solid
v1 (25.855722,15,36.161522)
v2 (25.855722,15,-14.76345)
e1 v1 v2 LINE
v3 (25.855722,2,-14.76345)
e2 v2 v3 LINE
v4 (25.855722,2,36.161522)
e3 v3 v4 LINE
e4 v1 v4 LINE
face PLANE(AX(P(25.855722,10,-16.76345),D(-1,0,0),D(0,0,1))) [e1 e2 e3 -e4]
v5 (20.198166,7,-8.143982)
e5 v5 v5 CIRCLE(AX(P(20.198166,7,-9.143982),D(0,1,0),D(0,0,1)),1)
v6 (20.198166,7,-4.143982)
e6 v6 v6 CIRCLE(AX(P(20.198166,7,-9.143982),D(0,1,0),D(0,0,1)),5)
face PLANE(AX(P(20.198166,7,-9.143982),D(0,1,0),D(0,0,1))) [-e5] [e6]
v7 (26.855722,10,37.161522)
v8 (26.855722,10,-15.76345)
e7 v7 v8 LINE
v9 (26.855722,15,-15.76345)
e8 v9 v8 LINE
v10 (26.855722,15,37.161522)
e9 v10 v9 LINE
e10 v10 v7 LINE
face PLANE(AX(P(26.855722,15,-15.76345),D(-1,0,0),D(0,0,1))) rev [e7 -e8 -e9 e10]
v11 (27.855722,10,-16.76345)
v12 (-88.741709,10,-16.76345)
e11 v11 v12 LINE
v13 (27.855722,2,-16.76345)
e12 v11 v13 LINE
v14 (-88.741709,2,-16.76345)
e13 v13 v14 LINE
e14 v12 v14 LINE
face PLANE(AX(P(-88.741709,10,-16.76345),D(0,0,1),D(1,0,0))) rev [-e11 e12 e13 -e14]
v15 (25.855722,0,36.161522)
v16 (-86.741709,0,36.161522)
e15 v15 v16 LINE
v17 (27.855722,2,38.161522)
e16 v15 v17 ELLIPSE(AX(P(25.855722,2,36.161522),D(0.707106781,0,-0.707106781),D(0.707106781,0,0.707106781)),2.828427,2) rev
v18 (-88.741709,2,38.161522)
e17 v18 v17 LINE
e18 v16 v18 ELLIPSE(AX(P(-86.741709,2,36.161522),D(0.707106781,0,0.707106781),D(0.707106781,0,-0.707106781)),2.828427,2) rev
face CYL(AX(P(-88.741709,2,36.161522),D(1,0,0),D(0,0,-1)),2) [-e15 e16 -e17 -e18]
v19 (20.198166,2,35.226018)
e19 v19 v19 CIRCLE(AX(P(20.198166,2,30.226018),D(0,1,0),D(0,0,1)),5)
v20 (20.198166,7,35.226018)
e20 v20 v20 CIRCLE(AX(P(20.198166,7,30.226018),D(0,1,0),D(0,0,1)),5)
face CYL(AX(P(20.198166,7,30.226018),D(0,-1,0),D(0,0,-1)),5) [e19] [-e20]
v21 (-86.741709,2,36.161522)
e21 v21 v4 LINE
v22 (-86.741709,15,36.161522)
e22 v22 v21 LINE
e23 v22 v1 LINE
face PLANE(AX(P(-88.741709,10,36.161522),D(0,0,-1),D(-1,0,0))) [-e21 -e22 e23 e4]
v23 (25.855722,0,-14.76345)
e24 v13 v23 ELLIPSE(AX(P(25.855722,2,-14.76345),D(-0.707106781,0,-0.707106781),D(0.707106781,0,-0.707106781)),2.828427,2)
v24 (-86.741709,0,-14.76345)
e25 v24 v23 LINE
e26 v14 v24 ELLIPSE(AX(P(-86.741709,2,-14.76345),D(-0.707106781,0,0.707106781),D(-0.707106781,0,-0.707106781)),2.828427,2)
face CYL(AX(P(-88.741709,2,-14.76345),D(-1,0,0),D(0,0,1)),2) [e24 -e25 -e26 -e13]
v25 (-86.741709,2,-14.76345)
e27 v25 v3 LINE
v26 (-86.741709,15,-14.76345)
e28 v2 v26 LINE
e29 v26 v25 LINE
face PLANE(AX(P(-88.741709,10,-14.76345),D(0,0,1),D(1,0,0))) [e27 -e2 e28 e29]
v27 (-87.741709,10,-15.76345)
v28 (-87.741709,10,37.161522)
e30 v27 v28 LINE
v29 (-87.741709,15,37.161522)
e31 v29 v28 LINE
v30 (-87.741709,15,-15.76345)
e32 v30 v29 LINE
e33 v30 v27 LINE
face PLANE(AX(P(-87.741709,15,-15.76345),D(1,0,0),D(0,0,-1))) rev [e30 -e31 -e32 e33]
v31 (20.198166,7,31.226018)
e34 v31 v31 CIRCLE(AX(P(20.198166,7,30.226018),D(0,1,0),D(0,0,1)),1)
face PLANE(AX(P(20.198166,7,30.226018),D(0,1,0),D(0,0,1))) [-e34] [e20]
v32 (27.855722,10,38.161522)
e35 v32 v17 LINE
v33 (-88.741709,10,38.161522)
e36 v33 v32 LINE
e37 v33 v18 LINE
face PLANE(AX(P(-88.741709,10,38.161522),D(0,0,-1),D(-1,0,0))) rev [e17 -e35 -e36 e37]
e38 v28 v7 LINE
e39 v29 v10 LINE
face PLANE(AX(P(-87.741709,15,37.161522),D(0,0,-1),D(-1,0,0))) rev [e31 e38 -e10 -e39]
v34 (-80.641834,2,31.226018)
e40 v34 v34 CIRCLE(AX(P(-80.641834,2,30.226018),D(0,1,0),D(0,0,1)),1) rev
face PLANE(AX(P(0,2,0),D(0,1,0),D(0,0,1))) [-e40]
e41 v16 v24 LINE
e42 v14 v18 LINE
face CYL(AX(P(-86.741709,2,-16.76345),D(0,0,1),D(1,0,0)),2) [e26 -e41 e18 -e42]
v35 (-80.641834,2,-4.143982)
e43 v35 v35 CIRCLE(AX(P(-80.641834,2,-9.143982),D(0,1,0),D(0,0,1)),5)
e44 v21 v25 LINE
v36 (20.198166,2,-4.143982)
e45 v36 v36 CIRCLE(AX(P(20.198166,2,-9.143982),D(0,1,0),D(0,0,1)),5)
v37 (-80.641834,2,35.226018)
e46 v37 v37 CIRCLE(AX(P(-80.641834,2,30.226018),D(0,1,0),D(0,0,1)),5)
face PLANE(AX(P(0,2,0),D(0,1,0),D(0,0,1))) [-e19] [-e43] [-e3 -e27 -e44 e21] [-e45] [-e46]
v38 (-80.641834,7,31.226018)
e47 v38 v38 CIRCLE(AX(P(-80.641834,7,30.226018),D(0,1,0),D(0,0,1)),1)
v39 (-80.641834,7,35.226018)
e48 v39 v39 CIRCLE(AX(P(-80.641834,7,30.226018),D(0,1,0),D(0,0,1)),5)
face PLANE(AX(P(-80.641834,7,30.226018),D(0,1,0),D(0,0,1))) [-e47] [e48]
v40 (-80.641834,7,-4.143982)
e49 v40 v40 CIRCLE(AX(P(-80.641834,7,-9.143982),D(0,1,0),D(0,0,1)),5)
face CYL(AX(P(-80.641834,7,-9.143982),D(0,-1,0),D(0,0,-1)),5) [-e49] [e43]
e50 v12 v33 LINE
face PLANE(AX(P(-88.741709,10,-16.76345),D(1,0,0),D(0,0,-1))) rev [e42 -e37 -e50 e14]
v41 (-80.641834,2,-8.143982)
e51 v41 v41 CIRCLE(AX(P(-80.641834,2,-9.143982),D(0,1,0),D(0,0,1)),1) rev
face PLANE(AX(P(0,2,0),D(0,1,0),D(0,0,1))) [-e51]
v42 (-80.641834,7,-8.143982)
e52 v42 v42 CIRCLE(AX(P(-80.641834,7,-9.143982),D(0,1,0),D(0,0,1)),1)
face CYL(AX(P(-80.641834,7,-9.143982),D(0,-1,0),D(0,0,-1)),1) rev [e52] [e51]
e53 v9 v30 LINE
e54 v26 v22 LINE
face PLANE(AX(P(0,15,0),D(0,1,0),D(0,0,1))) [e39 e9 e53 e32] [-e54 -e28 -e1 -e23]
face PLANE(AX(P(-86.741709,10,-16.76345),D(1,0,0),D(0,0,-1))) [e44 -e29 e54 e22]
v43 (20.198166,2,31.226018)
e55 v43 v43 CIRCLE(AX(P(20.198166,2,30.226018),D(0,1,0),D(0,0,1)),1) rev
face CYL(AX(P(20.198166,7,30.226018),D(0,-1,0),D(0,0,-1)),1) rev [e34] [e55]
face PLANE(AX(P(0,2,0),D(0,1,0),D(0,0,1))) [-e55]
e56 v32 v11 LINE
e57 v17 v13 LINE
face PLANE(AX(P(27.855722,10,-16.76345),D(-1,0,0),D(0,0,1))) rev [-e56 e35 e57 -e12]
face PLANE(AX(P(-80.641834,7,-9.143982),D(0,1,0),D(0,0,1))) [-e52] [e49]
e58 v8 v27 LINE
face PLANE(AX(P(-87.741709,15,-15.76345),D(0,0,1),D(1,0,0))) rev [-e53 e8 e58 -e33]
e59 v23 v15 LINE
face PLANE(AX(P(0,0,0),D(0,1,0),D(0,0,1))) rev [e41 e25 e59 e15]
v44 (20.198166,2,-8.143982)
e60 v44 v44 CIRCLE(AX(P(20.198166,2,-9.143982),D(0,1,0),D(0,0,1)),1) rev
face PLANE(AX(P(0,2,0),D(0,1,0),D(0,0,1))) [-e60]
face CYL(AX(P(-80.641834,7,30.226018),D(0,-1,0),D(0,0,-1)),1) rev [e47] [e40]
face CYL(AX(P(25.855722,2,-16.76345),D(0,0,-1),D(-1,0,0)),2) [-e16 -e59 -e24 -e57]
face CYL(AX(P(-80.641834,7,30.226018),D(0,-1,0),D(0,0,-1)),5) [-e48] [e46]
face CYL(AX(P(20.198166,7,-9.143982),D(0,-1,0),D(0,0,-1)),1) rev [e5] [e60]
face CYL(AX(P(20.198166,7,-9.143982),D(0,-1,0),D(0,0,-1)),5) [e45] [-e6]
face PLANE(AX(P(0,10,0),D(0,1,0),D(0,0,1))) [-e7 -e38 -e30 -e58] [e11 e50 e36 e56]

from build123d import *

# Parameters (mm, degrees)
ESQUISSE1_W             = 116.597430489
ESQUISSE1_H             = 54.924972195
BOSS_EXTRU_1_DEPTH      = 10
CONG_1_R                = 2
COQUE2_START            = -86.741708543
COQUE2_OUTLINE_W        = 6
COQUE2_OUTLINE_H        = 50.924972195
COQUE2_DEPTH            = 112.597430489
ESQUISSE2_W             = 112.597430489
ESQUISSE2_H             = 50.924972195
ENL_V_MAT_EXTRU_2_DEPTH = 2
SUPPORT_VIS_R           = 5
SUPPORT_VIS_R_2         = 1
EX_SUPPORT_DEPTH        = 5
PAROIS_W                = 114.597430489
PAROIS_H                = 52.924972195
PAROIS_W_2              = 112.597430489
PAROIS_H_2              = 50.924972195
EX_PAROIS_DEPTH         = 5


# Read off the part's stored shape, not the designer's step: Coque2
with BuildPart() as part:
    # Esquisse1 → Boss.-Extru.1 (new body)
    with BuildSketch(Plane(origin=(0, 0, 0), x_dir=(1, 0, 0), z_dir=(0, 1, 0))):
        with Locations((-30.442993298, -10.699035797)):
            Rectangle(ESQUISSE1_W, ESQUISSE1_H)
    extrude(amount=BOSS_EXTRU_1_DEPTH)

    # Congé1
    cong_1_edges = [part.edges().sort_by_distance(p)[0] for p in [
        (-30.442993298, 0, -16.7634503),
        (27.855721946, 0, 10.699035797),
        (-30.442993298, 0, 38.161521895),
        (-88.741708543, 0, 10.699035797),
    ]]
    fillet(cong_1_edges, radius=CONG_1_R)

    # Coque2 outline → Coque2 (cut)
    with BuildSketch(Plane.YZ.offset(COQUE2_START)):
        with Locations((5, 10.699035797)):
            Rectangle(COQUE2_OUTLINE_W, COQUE2_OUTLINE_H)
    extrude(amount=COQUE2_DEPTH, mode=Mode.SUBTRACT)

    # Esquisse2 → Enlèv. mat.-Extru.2 (cut)
    with BuildSketch(Plane(origin=(0, 10, 0), x_dir=(1, 0, 0), z_dir=(0, 1, 0))):
        with Locations((-30.442993298, -10.699035797)):
            Rectangle(ESQUISSE2_W, ESQUISSE2_H)
    extrude(amount=-ENL_V_MAT_EXTRU_2_DEPTH, mode=Mode.SUBTRACT)

    # support_vis → ex_support (add)
    # profile 1 of 4: a face of its own
    with BuildSketch(Plane(origin=(0, 2, 0), x_dir=(1, 0, 0), z_dir=(0, 1, 0))):
        with Locations(Location((-80.641833666, 9.143982461, 0), (0, 0, 270))):
            Circle(SUPPORT_VIS_R)
        with Locations(Location((-80.641833666, 9.143982461, 0), (0, 0, 270))):
            Circle(SUPPORT_VIS_R_2, mode=Mode.SUBTRACT)
    # profile 2 of 4: a face of its own
    with BuildSketch(Plane(origin=(0, 2, 0), x_dir=(1, 0, 0), z_dir=(0, 1, 0))):
        with Locations(Location((20.198166334, 9.143982461, 0), (0, 0, 270))):
            Circle(SUPPORT_VIS_R)
        with Locations(Location((20.198166334, 9.143982461, 0), (0, 0, 270))):
            Circle(SUPPORT_VIS_R_2, mode=Mode.SUBTRACT)
    # profile 3 of 4: a face of its own
    with BuildSketch(Plane(origin=(0, 2, 0), x_dir=(1, 0, 0), z_dir=(0, 1, 0))):
        with Locations(Location((-80.641833666, -30.226017539, 0), (0, 0, 270))):
            Circle(SUPPORT_VIS_R)
        with Locations(Location((-80.641833666, -30.226017539, 0), (0, 0, 270))):
            Circle(SUPPORT_VIS_R_2, mode=Mode.SUBTRACT)
    # profile 4 of 4: a face of its own
    with BuildSketch(Plane(origin=(0, 2, 0), x_dir=(1, 0, 0), z_dir=(0, 1, 0))):
        with Locations(Location((20.198166334, -30.226017539, 0), (0, 0, 270))):
            Circle(SUPPORT_VIS_R)
        with Locations(Location((20.198166334, -30.226017539, 0), (0, 0, 270))):
            Circle(SUPPORT_VIS_R_2, mode=Mode.SUBTRACT)
    extrude(amount=EX_SUPPORT_DEPTH)

    # parois → ex_parois (add)
    with BuildSketch(Plane(origin=(0, 10, 0), x_dir=(1, 0, 0), z_dir=(0, 1, 0))):
        with Locations((-30.442993298, -10.699035797)):
            Rectangle(PAROIS_W, PAROIS_H)
        with Locations((-30.442993298, -10.699035797)):
            Rectangle(PAROIS_W_2, PAROIS_H_2, mode=Mode.SUBTRACT)
    extrude(amount=EX_PAROIS_DEPTH)


solid = part.part
